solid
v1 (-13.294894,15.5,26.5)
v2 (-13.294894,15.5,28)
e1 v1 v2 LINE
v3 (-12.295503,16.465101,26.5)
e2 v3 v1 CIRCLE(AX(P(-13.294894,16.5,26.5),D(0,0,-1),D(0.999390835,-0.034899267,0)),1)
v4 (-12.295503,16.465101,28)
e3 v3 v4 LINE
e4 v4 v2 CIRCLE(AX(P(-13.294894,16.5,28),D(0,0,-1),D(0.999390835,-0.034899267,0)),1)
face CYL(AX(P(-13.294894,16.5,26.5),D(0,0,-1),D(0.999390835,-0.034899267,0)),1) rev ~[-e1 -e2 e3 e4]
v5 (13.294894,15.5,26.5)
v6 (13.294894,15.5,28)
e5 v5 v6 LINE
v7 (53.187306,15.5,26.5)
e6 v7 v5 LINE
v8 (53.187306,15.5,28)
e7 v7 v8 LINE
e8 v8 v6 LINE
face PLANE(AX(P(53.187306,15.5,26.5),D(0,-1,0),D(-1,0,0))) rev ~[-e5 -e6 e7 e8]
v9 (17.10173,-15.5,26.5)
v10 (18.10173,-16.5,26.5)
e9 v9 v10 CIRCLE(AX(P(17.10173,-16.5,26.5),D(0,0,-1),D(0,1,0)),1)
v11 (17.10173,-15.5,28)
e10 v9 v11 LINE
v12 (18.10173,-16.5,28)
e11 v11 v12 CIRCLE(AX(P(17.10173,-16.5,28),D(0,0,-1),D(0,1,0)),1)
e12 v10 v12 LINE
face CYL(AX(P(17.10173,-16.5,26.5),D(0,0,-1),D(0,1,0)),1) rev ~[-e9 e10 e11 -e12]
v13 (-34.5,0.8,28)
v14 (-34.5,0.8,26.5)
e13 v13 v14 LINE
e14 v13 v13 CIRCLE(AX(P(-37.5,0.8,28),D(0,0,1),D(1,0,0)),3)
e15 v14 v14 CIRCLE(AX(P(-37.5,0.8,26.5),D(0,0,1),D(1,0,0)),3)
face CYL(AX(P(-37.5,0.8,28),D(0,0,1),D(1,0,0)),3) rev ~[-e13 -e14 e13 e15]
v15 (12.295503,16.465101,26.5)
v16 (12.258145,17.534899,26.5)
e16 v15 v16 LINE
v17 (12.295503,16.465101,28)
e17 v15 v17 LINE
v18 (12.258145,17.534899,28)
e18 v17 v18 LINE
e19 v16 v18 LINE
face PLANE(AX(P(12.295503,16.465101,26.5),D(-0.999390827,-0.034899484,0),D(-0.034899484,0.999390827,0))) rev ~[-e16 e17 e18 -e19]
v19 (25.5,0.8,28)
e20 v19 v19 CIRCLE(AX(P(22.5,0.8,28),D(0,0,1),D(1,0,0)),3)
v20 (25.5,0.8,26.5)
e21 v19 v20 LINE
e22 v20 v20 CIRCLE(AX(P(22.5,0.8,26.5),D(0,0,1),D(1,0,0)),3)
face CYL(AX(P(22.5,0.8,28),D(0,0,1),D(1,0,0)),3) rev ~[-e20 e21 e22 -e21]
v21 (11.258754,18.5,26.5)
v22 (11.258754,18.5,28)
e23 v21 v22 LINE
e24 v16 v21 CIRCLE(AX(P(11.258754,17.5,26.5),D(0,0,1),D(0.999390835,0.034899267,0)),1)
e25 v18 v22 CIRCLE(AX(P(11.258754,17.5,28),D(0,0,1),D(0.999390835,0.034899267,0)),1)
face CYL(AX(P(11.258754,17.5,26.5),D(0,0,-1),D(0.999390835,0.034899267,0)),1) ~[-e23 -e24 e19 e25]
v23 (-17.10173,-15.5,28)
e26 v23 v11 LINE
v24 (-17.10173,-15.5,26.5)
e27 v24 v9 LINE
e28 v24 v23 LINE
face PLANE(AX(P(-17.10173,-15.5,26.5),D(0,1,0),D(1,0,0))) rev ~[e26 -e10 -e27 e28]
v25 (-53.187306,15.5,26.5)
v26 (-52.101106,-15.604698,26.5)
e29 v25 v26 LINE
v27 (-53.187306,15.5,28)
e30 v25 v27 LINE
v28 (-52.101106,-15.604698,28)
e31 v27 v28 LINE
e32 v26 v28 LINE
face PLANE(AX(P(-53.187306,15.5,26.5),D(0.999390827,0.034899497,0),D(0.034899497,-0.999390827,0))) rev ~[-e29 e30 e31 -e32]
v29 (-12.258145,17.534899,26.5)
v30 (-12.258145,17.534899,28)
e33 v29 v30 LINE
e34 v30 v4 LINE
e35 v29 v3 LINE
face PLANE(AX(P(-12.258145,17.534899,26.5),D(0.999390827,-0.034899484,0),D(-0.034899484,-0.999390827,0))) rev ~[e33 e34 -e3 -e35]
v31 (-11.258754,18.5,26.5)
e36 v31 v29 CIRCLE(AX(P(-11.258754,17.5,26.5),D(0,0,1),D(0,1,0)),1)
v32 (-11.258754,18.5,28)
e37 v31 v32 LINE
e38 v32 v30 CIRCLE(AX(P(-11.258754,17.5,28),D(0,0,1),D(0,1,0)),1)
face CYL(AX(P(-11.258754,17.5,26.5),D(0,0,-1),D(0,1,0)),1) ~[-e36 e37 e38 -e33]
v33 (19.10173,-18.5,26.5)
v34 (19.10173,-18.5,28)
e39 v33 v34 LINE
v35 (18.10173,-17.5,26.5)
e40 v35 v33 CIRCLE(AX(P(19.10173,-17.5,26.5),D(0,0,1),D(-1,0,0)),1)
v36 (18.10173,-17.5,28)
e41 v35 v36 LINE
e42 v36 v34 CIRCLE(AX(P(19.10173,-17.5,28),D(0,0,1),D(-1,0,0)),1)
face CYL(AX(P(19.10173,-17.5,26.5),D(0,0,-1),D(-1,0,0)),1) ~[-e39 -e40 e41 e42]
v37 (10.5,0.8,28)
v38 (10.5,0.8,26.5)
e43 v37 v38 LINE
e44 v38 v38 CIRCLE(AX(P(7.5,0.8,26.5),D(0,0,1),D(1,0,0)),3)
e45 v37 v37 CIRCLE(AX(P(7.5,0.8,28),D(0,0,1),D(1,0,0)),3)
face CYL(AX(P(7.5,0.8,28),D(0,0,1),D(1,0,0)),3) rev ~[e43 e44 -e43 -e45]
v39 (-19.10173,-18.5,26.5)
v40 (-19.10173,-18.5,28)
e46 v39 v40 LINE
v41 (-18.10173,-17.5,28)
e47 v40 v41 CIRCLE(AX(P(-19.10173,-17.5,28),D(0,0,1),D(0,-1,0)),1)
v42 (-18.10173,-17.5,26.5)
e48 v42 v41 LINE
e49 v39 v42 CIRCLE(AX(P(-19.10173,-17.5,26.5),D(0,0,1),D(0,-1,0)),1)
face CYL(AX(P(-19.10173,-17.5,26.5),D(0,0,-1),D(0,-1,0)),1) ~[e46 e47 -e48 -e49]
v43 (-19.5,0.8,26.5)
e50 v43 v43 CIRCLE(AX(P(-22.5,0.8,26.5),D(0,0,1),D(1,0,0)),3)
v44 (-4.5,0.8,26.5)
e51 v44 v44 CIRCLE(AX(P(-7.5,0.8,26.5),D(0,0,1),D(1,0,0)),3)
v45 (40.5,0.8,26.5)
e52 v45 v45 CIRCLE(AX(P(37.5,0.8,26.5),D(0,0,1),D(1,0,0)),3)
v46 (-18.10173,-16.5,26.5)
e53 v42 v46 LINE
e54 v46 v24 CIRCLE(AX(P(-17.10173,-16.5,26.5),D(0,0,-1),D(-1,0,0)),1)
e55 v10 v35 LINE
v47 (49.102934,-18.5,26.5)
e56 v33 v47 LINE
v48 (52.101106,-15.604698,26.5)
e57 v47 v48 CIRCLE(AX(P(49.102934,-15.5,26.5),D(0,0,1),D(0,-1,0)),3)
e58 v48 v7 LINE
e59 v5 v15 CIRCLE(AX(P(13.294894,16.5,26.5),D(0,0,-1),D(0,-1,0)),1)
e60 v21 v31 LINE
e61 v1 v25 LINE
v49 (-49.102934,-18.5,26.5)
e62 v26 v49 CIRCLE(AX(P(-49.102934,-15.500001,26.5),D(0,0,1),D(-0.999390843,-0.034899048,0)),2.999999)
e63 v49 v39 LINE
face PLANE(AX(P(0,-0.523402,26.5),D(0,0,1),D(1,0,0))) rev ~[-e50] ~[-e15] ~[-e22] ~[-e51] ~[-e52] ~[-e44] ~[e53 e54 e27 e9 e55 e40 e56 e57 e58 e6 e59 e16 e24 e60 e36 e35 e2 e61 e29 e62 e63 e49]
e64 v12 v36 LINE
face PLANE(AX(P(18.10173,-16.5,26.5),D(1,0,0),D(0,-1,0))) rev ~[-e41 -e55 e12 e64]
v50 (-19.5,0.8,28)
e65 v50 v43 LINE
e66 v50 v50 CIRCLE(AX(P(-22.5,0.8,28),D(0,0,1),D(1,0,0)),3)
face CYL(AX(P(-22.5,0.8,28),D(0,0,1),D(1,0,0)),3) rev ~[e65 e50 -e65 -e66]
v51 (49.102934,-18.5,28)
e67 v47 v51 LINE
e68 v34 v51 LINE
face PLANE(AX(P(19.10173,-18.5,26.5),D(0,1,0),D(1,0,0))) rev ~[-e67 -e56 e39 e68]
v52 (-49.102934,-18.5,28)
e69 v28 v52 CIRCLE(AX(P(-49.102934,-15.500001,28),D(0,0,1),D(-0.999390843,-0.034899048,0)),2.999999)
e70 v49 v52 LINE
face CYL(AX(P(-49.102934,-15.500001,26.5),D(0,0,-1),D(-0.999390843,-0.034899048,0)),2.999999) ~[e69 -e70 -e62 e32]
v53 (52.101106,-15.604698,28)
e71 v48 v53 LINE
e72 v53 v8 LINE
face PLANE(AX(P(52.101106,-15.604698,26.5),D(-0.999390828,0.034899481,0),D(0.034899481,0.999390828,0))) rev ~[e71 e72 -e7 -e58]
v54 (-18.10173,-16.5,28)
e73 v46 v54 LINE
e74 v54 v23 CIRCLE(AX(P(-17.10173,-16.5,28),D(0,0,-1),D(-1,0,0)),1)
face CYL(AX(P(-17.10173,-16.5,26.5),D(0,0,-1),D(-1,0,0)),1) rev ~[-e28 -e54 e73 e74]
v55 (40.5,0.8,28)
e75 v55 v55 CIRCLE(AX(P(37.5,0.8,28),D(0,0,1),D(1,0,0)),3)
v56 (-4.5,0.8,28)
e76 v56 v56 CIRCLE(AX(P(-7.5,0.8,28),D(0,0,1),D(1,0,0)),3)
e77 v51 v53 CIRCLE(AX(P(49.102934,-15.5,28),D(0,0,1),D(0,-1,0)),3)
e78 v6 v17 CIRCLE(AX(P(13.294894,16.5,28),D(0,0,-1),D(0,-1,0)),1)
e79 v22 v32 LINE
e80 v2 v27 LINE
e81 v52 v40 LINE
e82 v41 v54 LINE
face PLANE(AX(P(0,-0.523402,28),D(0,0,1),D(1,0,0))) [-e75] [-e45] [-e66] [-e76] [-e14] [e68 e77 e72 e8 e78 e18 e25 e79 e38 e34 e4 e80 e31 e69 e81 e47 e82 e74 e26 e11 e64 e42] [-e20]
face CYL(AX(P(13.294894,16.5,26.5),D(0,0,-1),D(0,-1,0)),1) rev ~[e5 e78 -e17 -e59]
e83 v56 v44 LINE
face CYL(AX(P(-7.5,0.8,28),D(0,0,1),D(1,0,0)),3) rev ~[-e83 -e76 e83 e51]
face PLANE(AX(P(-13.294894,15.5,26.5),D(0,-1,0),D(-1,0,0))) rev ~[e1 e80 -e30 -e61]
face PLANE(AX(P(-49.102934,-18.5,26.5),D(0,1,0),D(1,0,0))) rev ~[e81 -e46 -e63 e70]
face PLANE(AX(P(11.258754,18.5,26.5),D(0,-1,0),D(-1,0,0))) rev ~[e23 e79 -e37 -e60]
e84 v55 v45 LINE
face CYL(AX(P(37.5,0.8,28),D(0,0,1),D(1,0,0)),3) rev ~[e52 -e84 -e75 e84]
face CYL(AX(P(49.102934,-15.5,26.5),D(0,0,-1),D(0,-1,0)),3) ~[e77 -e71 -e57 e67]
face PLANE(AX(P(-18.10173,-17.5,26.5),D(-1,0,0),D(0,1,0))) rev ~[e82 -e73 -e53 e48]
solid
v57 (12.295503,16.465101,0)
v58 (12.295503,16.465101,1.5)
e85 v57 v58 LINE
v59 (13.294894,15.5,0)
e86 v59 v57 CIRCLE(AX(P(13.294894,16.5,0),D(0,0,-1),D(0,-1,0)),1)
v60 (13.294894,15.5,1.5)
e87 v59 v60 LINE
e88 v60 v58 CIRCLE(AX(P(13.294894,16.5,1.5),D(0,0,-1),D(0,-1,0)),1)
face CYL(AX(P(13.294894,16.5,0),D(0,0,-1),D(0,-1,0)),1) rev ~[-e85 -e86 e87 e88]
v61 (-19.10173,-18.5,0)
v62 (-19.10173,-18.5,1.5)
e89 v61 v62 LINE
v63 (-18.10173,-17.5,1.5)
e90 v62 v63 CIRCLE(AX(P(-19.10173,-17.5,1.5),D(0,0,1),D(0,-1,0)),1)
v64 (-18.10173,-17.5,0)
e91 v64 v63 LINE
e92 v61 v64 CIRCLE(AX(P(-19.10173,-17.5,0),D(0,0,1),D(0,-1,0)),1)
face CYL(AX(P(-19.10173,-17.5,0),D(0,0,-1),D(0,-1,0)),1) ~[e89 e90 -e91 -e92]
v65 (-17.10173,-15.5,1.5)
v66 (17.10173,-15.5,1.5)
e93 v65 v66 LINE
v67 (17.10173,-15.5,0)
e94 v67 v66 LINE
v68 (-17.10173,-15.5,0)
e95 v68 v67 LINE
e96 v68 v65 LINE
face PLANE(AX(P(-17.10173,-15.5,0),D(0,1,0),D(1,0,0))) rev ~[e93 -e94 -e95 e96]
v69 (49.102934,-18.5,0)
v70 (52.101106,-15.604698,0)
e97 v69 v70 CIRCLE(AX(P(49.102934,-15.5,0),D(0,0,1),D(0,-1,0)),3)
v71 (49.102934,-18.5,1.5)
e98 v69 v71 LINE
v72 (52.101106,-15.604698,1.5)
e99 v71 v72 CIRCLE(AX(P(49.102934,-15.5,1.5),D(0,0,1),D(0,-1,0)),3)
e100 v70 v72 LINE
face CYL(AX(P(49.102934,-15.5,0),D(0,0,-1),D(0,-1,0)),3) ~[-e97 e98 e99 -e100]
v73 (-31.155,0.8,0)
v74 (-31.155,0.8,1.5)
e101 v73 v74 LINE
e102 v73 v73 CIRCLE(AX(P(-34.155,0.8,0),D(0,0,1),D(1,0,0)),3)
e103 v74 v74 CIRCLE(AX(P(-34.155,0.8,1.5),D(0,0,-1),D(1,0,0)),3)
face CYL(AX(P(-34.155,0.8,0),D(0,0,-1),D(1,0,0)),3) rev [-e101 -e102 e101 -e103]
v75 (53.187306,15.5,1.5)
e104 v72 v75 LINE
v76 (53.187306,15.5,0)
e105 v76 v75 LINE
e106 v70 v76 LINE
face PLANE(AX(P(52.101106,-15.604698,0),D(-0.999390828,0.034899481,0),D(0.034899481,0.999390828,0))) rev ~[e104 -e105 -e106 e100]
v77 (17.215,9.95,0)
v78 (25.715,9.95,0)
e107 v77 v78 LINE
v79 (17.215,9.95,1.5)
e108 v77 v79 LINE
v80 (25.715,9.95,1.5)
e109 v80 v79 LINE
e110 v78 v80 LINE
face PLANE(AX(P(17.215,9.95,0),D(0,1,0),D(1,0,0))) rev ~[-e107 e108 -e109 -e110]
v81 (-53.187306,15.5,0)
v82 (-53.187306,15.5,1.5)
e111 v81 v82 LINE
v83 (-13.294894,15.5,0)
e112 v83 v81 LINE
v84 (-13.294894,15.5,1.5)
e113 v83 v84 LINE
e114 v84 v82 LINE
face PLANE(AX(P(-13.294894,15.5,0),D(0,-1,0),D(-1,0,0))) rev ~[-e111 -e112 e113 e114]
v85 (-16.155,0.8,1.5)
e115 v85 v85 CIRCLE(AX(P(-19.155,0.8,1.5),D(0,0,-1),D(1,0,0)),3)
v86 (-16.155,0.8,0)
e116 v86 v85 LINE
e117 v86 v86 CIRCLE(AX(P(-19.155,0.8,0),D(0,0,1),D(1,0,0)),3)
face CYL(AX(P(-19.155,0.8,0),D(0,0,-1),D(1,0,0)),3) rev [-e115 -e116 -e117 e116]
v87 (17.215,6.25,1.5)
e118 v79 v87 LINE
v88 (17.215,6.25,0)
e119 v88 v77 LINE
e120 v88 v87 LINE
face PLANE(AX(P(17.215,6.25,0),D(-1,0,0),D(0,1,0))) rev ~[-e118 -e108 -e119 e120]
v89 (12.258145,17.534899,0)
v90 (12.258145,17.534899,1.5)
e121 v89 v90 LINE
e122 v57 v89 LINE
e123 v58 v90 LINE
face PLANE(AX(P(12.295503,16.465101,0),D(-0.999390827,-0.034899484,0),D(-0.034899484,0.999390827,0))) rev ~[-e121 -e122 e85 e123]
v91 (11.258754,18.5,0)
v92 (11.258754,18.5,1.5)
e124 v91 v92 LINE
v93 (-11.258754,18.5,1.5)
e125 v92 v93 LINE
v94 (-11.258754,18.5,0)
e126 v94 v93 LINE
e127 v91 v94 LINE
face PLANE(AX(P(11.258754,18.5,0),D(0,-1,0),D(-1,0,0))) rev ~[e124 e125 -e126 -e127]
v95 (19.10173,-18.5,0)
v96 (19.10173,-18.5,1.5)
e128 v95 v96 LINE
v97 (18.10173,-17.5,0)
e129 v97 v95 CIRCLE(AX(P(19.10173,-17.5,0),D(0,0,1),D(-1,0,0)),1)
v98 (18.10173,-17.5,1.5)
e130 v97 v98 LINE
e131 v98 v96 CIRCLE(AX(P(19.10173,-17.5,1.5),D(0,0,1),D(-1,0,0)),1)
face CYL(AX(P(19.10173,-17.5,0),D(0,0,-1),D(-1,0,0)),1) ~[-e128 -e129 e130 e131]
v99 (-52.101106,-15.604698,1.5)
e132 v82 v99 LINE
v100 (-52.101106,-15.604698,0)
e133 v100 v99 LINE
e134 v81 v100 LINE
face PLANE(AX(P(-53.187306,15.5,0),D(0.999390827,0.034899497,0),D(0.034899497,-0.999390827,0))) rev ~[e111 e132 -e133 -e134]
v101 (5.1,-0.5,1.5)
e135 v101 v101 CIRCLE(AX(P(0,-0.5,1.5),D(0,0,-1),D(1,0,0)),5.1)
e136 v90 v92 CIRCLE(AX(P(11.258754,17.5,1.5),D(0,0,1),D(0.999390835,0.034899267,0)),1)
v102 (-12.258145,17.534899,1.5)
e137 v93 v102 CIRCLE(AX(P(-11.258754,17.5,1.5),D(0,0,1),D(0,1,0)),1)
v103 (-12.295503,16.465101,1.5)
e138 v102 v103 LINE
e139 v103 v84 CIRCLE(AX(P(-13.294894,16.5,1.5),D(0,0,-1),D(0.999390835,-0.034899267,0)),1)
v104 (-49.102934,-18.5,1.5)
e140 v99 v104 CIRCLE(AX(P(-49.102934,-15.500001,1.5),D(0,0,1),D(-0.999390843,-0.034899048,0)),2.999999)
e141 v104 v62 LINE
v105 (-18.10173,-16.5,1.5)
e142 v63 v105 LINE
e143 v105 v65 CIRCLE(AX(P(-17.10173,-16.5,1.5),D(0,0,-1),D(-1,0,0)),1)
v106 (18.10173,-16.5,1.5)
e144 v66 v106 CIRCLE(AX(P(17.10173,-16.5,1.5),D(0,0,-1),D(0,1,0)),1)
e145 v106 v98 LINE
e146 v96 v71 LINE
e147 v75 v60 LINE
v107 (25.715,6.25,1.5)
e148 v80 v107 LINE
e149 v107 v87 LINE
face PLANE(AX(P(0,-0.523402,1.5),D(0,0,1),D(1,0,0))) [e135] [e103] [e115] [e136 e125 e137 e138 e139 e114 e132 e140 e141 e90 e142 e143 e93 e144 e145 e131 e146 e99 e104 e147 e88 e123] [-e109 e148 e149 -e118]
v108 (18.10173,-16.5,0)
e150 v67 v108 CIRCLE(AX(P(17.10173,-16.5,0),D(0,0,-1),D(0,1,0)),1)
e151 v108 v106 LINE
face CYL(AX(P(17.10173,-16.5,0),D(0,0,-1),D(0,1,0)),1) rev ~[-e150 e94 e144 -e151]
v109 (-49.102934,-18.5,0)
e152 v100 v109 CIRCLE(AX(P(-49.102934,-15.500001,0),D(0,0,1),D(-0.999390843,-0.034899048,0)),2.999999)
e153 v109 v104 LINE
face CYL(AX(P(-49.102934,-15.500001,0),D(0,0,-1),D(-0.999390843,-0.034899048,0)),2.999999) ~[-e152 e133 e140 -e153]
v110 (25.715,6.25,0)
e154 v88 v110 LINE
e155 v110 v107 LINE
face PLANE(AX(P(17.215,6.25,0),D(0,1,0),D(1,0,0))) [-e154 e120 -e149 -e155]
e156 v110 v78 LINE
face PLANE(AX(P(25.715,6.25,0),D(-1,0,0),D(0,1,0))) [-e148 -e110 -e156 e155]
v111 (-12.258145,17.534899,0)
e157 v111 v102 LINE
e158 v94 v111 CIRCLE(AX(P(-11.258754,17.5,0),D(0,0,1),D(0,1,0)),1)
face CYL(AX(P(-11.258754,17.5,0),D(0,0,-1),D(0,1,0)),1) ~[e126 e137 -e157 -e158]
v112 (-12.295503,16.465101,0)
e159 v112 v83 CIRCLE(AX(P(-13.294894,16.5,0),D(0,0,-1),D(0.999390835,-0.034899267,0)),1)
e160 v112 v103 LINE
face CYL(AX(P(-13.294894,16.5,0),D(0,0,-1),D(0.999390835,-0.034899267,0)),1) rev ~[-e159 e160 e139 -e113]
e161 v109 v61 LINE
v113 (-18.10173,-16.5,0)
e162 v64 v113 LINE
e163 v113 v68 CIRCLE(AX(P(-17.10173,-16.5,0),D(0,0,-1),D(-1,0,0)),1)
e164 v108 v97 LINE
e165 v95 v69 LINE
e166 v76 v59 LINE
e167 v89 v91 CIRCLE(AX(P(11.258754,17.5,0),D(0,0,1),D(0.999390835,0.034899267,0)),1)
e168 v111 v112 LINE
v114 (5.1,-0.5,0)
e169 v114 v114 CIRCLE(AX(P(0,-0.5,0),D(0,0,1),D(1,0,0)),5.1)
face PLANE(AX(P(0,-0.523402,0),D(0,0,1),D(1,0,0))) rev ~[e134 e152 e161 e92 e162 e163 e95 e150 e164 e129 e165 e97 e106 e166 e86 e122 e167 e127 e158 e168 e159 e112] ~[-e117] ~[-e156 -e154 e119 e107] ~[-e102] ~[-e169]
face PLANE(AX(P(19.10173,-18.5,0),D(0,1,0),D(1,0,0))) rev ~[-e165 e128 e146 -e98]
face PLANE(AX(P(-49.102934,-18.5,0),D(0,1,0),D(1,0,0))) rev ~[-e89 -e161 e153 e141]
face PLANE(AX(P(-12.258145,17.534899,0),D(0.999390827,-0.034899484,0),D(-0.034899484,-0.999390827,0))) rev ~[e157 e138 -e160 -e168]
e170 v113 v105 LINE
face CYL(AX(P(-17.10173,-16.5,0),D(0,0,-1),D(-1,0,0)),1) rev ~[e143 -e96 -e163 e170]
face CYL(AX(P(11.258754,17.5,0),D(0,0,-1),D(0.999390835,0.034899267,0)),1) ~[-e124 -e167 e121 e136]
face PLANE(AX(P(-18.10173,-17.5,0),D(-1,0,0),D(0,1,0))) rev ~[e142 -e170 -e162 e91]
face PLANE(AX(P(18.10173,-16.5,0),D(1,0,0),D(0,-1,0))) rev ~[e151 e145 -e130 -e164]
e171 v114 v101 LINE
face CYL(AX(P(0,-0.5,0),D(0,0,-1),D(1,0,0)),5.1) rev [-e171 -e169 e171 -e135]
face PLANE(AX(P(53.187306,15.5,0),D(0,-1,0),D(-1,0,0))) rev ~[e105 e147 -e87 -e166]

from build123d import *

# Parameters (mm, degrees)
F1_DEPTH = 1.5
F2_R     = 3
F2_R_2   = 5.1
F2_W     = 8.5
F2_H     = 3.7
F3_DEPTH = 25
F6_DEPTH = 1.5
F7_R     = 3
F8_DEPTH = 5


# Not quite as in the source:
# - ends of sketch curves that miss each other by under 0.0002 mm in the source are joined


with BuildPart() as f1:
    # F0 (on Top) → F1 (new body)
    with BuildSketch(Plane.XY):
        with BuildLine():
            ThreePointArc((49.102934, -18.5), (51.1869092815, -17.6580192367), (52.1011064976, -15.6046980174))
            Line((52.1011064976, -15.6046980174), (53.187306, 15.5))
            Line((53.187306, 15.5), (13.294894, 15.5))
            ThreePointArc((13.294894, 15.5), (12.6002354488, 15.7806603742), (12.2955031554, 16.4651010054))
            Line((12.2955031554, 16.4651010054), (12.258145, 17.534899))
            ThreePointArc((12.258145, 17.534899), (11.9534125512, 18.2193396258), (11.258754, 18.5))
            Line((11.258754, 18.5), (-11.258754, 18.5))
            ThreePointArc((-11.258754, 18.5), (-11.9534125512, 18.2193396258), (-12.2581448446, 17.5348989946))
            Line((-12.2581448446, 17.5348989946), (-12.295503, 16.465101))
            ThreePointArc((-12.295503, 16.465101), (-12.6002354488, 15.7806603742), (-13.294894, 15.5))
            Line((-13.294894, 15.5), (-53.187306, 15.5))
            Line((-53.187306, 15.5), (-52.101106, -15.604698))
            ThreePointArc((-52.101106, -15.604698), (-51.1869092815, -17.6580192367), (-49.102934, -18.5))
            Line((-49.102934, -18.5), (-19.10173, -18.5))
            ThreePointArc((-19.10173, -18.5), (-18.3946232188, -18.2071067812), (-18.10173, -17.5))
            Line((-18.10173, -17.5), (-18.10173, -16.5))
            ThreePointArc((-18.10173, -16.5), (-17.8088367812, -15.7928932188), (-17.10173, -15.5))
            Line((-17.10173, -15.5), (17.10173, -15.5))
            ThreePointArc((17.10173, -15.5), (17.8088367812, -15.7928932188), (18.10173, -16.5))
            Line((18.10173, -16.5), (18.10173, -17.5))
            ThreePointArc((18.10173, -17.5), (18.3946232188, -18.2071067812), (19.10173, -18.5))
            Line((19.10173, -18.5), (49.102934, -18.5))
        make_face()
    extrude(amount=F1_DEPTH)

    # F2 (on face) → F3 (cut)
    with BuildSketch(Plane.XY):
        with Locations((-34.155, 0.8)):
            Circle(F2_R)
        with Locations((-19.155, 0.8)):
            Circle(F2_R)
        with Locations((0, -0.5)):
            Circle(F2_R_2)
        with Locations((21.465, 8.1)):
            Rectangle(F2_W, F2_H)
    extrude(amount=F3_DEPTH, mode=Mode.SUBTRACT)


with BuildPart() as f6:
    # F5 (on offset) → F6 (new body)
    with BuildSketch(Plane.XY.offset(26.5)):
        with BuildLine():
            ThreePointArc((49.102934, -18.5), (51.1869092815, -17.6580192367), (52.1011064976, -15.6046980174))
            Line((52.1011064976, -15.6046980174), (53.187306, 15.5))
            Line((53.187306, 15.5), (13.294894, 15.5))
            ThreePointArc((13.294894, 15.5), (12.6002354488, 15.7806603742), (12.2955031554, 16.4651010054))
            Line((12.2955031554, 16.4651010054), (12.258145, 17.534899))
            ThreePointArc((12.258145, 17.534899), (11.9534125512, 18.2193396258), (11.258754, 18.5))
            Line((11.258754, 18.5), (-11.258754, 18.5))
            ThreePointArc((-11.258754, 18.5), (-11.9534125512, 18.2193396258), (-12.2581448446, 17.5348989946))
            Line((-12.2581448446, 17.5348989946), (-12.295503, 16.465101))
            ThreePointArc((-12.295503, 16.465101), (-12.6002354488, 15.7806603742), (-13.294894, 15.5))
            Line((-13.294894, 15.5), (-53.187306, 15.5))
            Line((-53.187306, 15.5), (-52.101106, -15.604698))
            ThreePointArc((-52.101106, -15.604698), (-51.1869092815, -17.6580192367), (-49.102934, -18.5))
            Line((-49.102934, -18.5), (-19.10173, -18.5))
            ThreePointArc((-19.10173, -18.5), (-18.3946232188, -18.2071067812), (-18.10173, -17.5))
            Line((-18.10173, -17.5), (-18.10173, -16.5))
            ThreePointArc((-18.10173, -16.5), (-17.8088367812, -15.7928932188), (-17.10173, -15.5))
            Line((-17.10173, -15.5), (17.10173, -15.5))
            ThreePointArc((17.10173, -15.5), (17.8088367812, -15.7928932188), (18.10173, -16.5))
            Line((18.10173, -16.5), (18.10173, -17.5))
            ThreePointArc((18.10173, -17.5), (18.3946232188, -18.2071067812), (19.10173, -18.5))
            Line((19.10173, -18.5), (49.102934, -18.5))
        make_face()
    extrude(amount=F6_DEPTH)

    # F7 (on face) → F8 (cut)
    with BuildSketch(Plane.XY.offset(28)):
        with Locations((-37.5, 0.8)):
            Circle(F7_R)
        with Locations((-22.5, 0.8)):
            Circle(F7_R)
        with Locations((-7.5, 0.8)):
            Circle(F7_R)
        with Locations((7.5, 0.8)):
            Circle(F7_R)
        with Locations((37.5, 0.8)):
            Circle(F7_R)
        with Locations((22.5, 0.8)):
            Circle(F7_R)
    extrude(amount=-F8_DEPTH, mode=Mode.SUBTRACT)


solid = Compound([f1.part, f6.part])
